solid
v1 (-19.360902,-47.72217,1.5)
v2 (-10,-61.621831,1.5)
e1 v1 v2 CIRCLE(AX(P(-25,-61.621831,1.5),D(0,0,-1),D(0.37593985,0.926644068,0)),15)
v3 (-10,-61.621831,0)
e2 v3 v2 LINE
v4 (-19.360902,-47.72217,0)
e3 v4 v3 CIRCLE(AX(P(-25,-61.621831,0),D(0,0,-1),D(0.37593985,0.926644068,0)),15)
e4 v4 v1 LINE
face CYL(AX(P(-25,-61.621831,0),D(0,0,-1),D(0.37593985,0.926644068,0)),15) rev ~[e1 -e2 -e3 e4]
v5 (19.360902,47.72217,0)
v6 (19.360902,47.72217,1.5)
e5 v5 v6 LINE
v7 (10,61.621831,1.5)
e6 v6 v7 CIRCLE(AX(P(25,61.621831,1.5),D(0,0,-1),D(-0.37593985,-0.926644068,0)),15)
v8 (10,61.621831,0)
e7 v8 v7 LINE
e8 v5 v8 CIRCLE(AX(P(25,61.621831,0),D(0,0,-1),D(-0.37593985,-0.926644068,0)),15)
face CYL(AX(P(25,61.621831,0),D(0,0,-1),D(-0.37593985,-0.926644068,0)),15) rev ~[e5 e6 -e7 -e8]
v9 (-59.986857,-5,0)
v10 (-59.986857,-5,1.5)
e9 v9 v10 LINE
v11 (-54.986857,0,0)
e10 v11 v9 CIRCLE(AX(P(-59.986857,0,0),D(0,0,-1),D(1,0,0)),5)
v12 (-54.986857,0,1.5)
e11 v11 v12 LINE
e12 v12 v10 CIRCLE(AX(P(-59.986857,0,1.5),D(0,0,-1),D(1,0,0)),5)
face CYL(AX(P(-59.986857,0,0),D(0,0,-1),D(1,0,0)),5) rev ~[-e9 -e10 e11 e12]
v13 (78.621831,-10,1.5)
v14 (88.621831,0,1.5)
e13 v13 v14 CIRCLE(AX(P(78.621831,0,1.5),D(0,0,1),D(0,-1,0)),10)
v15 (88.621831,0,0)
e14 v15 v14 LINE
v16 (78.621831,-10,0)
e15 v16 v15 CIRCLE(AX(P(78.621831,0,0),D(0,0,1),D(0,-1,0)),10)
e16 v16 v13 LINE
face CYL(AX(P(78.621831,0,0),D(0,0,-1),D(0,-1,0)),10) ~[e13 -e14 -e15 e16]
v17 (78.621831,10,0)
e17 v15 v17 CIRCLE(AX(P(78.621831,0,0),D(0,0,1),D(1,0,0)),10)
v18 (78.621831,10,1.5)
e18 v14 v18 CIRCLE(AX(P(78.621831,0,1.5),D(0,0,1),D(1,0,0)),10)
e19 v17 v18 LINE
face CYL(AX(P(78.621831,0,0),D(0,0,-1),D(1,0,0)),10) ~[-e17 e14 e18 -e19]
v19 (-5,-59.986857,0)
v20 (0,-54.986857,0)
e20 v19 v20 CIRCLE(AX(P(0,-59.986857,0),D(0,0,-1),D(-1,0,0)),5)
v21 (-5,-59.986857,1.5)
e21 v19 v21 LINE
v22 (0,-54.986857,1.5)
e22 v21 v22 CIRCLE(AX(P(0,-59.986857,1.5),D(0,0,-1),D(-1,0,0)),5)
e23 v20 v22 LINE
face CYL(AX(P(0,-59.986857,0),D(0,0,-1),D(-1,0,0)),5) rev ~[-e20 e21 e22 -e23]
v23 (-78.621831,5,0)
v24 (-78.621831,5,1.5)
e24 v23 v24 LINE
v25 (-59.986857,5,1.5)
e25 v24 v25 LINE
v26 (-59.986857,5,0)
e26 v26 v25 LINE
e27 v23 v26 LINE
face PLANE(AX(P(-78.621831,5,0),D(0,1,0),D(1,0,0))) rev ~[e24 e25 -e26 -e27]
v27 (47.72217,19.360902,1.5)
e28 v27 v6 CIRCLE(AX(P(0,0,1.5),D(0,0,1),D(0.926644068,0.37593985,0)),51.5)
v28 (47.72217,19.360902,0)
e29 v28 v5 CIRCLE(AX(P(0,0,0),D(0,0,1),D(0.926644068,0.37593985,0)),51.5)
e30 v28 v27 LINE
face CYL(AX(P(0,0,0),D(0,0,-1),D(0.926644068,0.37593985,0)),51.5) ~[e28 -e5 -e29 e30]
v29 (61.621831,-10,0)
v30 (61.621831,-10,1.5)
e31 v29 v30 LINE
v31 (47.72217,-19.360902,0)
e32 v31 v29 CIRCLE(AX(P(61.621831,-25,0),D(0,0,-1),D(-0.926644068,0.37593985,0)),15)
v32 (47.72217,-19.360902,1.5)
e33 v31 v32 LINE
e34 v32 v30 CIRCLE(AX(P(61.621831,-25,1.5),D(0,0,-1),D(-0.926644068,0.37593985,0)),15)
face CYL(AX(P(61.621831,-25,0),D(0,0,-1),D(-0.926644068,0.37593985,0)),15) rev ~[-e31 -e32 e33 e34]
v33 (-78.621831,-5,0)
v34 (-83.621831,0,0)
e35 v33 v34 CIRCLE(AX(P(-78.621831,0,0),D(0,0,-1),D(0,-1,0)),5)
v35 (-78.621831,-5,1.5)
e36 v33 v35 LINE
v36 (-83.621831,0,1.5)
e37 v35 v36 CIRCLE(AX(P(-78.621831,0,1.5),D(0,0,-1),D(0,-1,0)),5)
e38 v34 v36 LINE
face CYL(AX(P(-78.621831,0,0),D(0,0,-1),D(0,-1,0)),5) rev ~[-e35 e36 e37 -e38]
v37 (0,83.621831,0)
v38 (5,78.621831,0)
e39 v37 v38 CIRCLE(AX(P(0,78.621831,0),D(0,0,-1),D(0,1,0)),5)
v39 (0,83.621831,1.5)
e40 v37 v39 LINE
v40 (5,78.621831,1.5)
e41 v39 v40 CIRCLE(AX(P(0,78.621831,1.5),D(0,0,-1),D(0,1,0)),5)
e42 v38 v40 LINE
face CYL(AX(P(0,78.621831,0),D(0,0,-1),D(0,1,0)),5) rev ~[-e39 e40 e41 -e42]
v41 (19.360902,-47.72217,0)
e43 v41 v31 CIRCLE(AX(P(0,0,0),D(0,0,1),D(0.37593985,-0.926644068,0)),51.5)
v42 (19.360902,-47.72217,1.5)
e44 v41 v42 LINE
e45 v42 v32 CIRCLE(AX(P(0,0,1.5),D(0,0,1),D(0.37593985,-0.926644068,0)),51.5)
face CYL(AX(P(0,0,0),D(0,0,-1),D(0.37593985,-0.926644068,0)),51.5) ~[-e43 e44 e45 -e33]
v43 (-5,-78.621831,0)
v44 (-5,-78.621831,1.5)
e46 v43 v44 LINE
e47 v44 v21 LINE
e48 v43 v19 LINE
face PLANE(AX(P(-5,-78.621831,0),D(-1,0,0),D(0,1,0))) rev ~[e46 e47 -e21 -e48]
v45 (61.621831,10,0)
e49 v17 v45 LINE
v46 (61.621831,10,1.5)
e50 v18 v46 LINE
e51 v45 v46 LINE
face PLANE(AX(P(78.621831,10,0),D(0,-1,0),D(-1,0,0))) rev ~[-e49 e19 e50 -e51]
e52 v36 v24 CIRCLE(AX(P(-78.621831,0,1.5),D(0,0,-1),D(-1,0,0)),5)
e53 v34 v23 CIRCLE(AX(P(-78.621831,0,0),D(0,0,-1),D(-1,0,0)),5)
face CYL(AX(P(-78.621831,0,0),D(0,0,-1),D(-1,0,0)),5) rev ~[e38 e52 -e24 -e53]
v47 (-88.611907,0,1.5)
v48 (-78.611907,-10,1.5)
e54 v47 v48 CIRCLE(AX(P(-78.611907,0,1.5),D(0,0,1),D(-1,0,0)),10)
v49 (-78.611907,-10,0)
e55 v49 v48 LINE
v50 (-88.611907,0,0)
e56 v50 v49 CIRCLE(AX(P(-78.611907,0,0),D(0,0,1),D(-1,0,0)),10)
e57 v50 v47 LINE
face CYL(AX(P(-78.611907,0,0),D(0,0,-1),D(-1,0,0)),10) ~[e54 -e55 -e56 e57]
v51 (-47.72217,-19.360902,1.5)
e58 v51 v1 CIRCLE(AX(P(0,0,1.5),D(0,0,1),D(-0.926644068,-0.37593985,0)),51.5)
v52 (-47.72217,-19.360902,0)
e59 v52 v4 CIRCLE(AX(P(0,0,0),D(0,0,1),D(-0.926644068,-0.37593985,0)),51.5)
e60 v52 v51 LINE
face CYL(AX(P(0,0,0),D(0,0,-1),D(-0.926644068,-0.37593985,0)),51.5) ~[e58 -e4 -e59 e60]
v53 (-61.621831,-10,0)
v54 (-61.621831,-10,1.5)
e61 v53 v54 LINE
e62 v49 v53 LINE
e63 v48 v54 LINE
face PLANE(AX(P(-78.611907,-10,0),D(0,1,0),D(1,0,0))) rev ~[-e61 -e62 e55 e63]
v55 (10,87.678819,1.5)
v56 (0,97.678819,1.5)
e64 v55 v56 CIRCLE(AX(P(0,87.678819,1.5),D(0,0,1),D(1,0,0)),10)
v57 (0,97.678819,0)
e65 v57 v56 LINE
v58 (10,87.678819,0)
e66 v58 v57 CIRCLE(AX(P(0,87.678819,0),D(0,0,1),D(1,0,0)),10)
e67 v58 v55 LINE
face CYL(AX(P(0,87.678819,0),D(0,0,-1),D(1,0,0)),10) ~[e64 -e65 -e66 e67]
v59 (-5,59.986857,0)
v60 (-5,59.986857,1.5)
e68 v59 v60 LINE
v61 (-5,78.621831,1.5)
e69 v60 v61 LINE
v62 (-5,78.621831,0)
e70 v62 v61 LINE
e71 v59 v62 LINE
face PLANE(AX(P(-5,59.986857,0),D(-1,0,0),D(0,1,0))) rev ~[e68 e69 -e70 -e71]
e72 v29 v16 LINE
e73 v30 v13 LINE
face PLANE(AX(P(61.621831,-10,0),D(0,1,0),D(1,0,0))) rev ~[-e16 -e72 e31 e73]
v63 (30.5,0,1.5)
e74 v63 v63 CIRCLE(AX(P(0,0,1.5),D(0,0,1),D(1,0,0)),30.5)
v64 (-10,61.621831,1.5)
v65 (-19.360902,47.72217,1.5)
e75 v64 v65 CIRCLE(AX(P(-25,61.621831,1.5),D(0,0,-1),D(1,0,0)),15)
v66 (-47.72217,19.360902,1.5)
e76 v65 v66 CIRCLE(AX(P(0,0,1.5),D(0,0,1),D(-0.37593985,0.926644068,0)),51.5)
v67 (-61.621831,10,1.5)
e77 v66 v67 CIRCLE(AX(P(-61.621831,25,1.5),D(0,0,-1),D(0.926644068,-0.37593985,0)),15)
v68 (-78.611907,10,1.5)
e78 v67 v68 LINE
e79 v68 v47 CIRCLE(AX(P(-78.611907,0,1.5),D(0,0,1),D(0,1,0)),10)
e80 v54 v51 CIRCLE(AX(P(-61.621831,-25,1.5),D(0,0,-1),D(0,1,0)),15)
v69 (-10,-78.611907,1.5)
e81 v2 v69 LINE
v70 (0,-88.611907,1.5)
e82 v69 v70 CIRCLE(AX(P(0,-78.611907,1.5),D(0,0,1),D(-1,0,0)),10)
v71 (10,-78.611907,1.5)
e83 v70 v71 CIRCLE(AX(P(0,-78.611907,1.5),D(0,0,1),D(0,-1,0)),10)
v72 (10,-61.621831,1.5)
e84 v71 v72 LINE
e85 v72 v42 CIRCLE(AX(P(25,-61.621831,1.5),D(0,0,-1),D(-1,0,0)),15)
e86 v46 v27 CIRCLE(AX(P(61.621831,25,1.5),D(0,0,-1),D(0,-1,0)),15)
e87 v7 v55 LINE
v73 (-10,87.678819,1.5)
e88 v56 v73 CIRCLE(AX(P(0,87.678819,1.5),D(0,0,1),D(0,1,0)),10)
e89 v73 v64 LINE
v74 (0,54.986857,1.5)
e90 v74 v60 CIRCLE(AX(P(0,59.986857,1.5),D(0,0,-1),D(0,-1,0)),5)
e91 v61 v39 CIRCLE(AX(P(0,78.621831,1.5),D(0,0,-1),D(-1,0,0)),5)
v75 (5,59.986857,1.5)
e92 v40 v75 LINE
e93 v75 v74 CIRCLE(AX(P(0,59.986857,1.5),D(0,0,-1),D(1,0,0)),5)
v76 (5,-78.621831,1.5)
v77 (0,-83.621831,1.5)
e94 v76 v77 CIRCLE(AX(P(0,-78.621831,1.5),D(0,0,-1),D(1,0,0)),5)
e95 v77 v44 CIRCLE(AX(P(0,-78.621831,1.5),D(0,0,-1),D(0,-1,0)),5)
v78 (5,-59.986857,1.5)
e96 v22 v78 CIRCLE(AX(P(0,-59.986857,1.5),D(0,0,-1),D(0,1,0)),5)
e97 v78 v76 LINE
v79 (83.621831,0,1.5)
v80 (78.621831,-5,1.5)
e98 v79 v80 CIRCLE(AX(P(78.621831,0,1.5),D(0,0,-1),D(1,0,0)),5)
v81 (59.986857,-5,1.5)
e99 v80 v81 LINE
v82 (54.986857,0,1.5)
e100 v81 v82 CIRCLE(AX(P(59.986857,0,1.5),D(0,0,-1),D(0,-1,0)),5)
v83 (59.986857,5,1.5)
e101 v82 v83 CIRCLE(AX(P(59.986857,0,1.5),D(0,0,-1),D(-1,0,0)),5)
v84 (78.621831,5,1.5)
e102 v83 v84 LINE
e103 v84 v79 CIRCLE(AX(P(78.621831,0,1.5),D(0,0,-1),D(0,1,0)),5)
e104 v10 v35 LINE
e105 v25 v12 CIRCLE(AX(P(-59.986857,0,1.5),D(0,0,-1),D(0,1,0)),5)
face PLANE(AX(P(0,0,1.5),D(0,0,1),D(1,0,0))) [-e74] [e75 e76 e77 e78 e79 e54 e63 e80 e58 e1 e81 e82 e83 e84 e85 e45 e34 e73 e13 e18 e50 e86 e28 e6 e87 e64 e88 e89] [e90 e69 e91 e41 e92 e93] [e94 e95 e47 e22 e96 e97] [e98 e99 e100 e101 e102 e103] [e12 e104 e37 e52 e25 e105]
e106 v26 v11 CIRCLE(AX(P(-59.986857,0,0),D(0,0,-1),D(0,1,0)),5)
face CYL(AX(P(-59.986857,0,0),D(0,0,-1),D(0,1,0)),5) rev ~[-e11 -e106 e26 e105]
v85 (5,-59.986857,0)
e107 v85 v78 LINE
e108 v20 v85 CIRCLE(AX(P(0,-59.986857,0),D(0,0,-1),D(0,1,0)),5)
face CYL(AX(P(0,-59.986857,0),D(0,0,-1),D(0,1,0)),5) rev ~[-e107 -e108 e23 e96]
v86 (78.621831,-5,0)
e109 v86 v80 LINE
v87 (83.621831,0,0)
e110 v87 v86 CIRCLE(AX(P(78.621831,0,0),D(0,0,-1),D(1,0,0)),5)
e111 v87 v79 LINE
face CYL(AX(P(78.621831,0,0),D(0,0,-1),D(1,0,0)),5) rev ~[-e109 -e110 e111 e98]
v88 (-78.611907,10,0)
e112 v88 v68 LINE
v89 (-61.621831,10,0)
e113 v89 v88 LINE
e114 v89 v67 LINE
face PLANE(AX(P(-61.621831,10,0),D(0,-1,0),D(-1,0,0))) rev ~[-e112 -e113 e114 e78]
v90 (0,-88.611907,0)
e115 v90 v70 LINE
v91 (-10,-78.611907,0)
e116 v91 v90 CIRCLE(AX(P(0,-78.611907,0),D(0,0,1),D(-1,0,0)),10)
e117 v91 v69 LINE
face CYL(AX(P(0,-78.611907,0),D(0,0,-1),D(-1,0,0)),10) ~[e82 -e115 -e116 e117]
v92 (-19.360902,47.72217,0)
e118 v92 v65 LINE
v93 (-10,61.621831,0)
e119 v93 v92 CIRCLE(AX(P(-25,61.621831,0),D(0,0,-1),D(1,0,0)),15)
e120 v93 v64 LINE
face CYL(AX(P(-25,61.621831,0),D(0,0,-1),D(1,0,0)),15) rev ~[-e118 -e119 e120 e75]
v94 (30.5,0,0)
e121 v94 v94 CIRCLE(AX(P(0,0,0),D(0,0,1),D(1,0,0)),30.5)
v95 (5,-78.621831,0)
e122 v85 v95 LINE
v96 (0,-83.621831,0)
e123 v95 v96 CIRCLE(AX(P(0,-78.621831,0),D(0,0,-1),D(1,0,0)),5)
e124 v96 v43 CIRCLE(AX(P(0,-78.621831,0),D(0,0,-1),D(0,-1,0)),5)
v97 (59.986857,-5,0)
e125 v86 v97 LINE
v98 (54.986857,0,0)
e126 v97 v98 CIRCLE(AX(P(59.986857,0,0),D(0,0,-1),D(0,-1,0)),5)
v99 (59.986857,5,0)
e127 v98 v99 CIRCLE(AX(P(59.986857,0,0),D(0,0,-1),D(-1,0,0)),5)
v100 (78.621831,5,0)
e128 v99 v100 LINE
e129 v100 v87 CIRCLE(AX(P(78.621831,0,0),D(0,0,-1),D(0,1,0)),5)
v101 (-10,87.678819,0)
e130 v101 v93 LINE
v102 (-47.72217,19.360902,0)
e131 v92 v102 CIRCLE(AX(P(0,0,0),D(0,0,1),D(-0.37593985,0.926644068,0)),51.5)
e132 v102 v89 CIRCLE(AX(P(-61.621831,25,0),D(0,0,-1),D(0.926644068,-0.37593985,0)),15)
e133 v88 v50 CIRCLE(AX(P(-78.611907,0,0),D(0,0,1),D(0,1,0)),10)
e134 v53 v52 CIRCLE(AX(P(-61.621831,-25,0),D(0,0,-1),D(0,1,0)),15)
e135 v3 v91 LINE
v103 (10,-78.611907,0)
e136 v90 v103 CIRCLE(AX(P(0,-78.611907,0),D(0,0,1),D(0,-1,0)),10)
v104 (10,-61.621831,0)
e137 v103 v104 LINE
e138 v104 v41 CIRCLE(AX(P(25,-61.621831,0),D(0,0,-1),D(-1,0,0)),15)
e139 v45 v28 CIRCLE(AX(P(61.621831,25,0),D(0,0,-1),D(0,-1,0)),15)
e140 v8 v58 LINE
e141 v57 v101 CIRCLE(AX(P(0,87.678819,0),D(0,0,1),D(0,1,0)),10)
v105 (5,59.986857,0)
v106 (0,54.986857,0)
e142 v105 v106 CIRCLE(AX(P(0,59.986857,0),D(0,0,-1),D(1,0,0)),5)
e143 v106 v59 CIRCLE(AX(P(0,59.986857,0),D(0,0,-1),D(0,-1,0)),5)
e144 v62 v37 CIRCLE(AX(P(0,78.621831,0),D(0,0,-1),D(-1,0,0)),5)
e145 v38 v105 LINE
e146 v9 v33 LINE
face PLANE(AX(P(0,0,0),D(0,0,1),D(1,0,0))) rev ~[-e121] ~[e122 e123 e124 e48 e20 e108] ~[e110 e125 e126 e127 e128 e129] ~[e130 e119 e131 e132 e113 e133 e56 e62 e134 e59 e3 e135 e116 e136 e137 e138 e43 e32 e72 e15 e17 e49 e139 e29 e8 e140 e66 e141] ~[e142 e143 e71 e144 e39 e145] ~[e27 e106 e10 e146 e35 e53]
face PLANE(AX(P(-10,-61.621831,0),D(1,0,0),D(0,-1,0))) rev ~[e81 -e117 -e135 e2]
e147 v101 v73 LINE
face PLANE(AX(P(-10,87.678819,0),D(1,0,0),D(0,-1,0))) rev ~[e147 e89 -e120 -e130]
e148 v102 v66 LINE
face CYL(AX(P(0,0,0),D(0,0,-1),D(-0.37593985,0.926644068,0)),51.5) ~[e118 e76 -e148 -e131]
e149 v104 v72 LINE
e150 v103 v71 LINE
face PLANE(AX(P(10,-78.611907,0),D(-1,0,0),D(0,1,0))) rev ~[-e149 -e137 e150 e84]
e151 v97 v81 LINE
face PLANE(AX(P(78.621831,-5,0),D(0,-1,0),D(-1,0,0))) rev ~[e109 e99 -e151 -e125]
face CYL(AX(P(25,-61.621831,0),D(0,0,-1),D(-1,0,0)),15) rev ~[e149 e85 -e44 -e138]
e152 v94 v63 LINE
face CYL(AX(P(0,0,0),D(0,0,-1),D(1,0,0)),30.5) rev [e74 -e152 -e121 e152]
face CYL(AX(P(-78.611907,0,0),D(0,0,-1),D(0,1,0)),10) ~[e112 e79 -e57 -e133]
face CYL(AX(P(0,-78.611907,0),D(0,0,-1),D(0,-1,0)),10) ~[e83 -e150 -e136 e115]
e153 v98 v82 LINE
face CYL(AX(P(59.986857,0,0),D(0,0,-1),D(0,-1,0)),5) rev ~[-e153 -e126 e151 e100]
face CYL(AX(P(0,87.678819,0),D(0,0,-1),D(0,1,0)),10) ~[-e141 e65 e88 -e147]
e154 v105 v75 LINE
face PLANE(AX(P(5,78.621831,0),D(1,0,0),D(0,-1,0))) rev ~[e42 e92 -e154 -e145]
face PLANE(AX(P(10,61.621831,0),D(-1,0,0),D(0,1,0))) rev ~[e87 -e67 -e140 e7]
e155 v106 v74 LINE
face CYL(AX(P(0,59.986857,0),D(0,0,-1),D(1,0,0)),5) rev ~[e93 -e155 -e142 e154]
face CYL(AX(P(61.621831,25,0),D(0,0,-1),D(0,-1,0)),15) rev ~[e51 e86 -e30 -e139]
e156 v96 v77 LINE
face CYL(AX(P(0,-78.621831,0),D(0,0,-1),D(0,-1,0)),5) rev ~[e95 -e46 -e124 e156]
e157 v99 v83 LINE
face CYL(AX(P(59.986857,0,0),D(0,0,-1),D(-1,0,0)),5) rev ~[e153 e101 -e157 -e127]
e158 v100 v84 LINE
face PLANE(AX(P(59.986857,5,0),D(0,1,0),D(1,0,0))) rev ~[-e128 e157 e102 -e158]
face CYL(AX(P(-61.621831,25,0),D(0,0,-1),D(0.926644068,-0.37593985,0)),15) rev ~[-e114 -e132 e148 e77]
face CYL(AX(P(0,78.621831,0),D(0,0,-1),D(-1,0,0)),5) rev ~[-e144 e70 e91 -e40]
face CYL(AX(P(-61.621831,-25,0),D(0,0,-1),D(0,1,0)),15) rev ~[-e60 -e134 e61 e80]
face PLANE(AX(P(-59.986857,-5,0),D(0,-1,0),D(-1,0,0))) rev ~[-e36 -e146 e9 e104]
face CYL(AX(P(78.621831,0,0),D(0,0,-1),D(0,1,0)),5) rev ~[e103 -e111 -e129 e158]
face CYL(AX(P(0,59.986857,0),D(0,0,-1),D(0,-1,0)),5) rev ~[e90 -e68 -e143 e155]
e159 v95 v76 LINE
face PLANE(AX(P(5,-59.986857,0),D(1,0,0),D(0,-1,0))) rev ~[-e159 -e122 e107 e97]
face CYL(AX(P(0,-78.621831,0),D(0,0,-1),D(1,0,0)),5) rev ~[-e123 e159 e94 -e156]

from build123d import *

# Parameters (mm, degrees)
F0_R     = 30.5
F0_W     = 5
F0_H     = 10.5
F0_W_2   = 10.5
F0_H_2   = 5
F1_DEPTH = 1.5


# Not quite as in the source:
# - a feature names something its author has since deleted; it is built from what else it names


with BuildPart() as f1:
    # F0 (on Top) → F1 (new body)
    with BuildSketch(Plane.XY):
        with BuildLine():
            ThreePointArc((-10, 61.6218305473), (-12.5584071324, 53.2428827066), (-19.3609022556, 47.7221695216))
            ThreePointArc((-19.3609022556, 47.7221695216), (-36.4159992311, 36.4159992311), (-47.7221695216, 19.3609022556))
            ThreePointArc((-47.7221695216, 19.3609022556), (-53.2428827066, 12.5584071324), (-61.6218305473, 10))
            Line((-61.6218305473, 10), (-65.6218305473, 10))
            Line((-65.6218305473, 10), (-65.6218305473, 5))
            Line((-65.6218305473, 5), (-59.986856736, 5))
            ThreePointArc((-59.986856736, 5), (-56.45132283, 3.5355339059), (-54.986856736, 0))
            ThreePointArc((-54.986856736, 0), (-56.45132283, -3.5355339059), (-59.986856736, -5))
            Line((-59.986856736, -5), (-65.6218305473, -5))
            Line((-65.6218305473, -5), (-65.6218305473, -10))
            Line((-65.6218305473, -10), (-61.6218305473, -10))
            ThreePointArc((-61.6218305473, -10), (-53.2428827066, -12.5584071324), (-47.7221695216, -19.3609022556))
            ThreePointArc((-47.7221695216, -19.3609022556), (-36.4159992311, -36.4159992311), (-19.3609022556, -47.7221695216))
            ThreePointArc((-19.3609022556, -47.7221695216), (-12.5584071324, -53.2428827066), (-10, -61.6218305473))
            Line((-10, -61.6218305473), (-10, -65.6218305473))
            Line((-10, -65.6218305473), (-5, -65.6218305473))
            Line((-5, -65.6218305473), (-5, -59.986856736))
            ThreePointArc((-5, -59.986856736), (-3.5355339059, -56.45132283), (0, -54.986856736))
            ThreePointArc((0, -54.986856736), (3.5355339059, -56.45132283), (5, -59.986856736))
            Line((5, -59.986856736), (5, -65.6218305473))
            Line((5, -65.6218305473), (10, -65.6218305473))
            Line((10, -65.6218305473), (10, -61.6218305473))
            ThreePointArc((10, -61.6218305473), (12.5584071324, -53.2428827066), (19.3609022556, -47.7221695216))
            ThreePointArc((19.3609022556, -47.7221695216), (36.4159992311, -36.4159992311), (47.7221695216, -19.3609022556))
            ThreePointArc((47.7221695216, -19.3609022556), (53.2428827066, -12.5584071324), (61.6218305473, -10))
            Line((61.6218305473, -10), (65.6218305473, -10))
            Line((65.6218305473, -10), (65.6218305473, -5))
            Line((65.6218305473, -5), (59.986856736, -5))
            ThreePointArc((59.986856736, -5), (56.45132283, -3.5355339059), (54.986856736, 0))
            ThreePointArc((54.986856736, 0), (56.45132283, 3.5355339059), (59.986856736, 5))
            Line((59.986856736, 5), (65.6218305473, 5))
            Line((65.6218305473, 5), (65.6218305473, 10))
            Line((65.6218305473, 10), (61.6218305473, 10))
            ThreePointArc((61.6218305473, 10), (53.2428827066, 12.5584071324), (47.7221695216, 19.3609022556))
            ThreePointArc((47.7221695216, 19.3609022556), (36.4159992311, 36.4159992311), (19.3609022556, 47.7221695216))
            ThreePointArc((19.3609022556, 47.7221695216), (12.5584071324, 53.2428827066), (10, 61.6218305473))
            Line((10, 61.6218305473), (10, 65.6218305473))
            Line((10, 65.6218305473), (5, 65.6218305473))
            Line((5, 65.6218305473), (5, 59.986856736))
            ThreePointArc((5, 59.986856736), (3.5355339059, 56.45132283), (0, 54.986856736))
            ThreePointArc((0, 54.986856736), (-3.5355339059, 56.45132283), (-5, 59.986856736))
            Line((-5, 59.986856736), (-5, 65.6218305473))
            Line((-5, 65.6218305473), (-10, 65.6218305473))
            Line((-10, 65.6218305473), (-10, 61.6218305473))
        make_face()
        Circle(F0_R, mode=Mode.SUBTRACT)
        with Locations((7.5, 70.8718305473)):
            Rectangle(F0_W, F0_H)
        with Locations((-7.5, 70.8718305473)):
            Rectangle(F0_W, F0_H)
        with Locations((70.8718305473, 7.5)):
            Rectangle(F0_W_2, F0_H_2)
        with Locations((70.8718305473, -7.5)):
            Rectangle(F0_W_2, F0_H_2)
        with BuildLine():
            Line((78.6218305473, 10), (76.1218305473, 10))
            Line((76.1218305473, 10), (76.1218305473, 5))
            Line((76.1218305473, 5), (78.6218305473, 5))
            ThreePointArc((78.6218305473, 5), (82.1573644532, 3.5355339059), (83.6218305473, 0))
            ThreePointArc((83.6218305473, 0), (82.1573644532, -3.5355339059), (78.6218305473, -5))
            Line((78.6218305473, -5), (76.1218305473, -5))
            Line((76.1218305473, -5), (76.1218305473, -10))
            Line((76.1218305473, -10), (78.6218305473, -10))
            ThreePointArc((78.6218305473, -10), (85.6928983592, -7.0710678119), (88.6218305473, 0))
            ThreePointArc((88.6218305473, 0), (85.6928983592, 7.0710678119), (78.6218305473, 10))
        make_face()
        with Locations((-70.8718305473, -7.5)):
            Rectangle(F0_W_2, F0_H_2)
        with Locations((-70.8718305473, 7.5)):
            Rectangle(F0_W_2, F0_H_2)
        with BuildLine():
            Line((-76.1218305473, 5), (-76.1218305473, 10))
            Line((-76.1218305473, 10), (-78.611907205, 10))
            ThreePointArc((-78.611907205, 10), (-85.6829750169, 7.0710678119), (-88.611907205, 0))
            ThreePointArc((-88.611907205, 0), (-85.6829750169, -7.0710678119), (-78.611907205, -10))
            Line((-78.611907205, -10), (-76.1218305473, -10))
            Line((-76.1218305473, -10), (-76.1218305473, -5))
            Line((-76.1218305473, -5), (-78.6218305473, -5))
            ThreePointArc((-78.6218305473, -5), (-82.1573644532, -3.5355339059), (-83.6218305473, 0))
            ThreePointArc((-83.6218305473, 0), (-82.1573644532, 3.5355339059), (-78.6218305473, 5))
            Line((-78.6218305473, 5), (-76.1218305473, 5))
        make_face()
        with Locations((-7.5, -70.8718305473)):
            Rectangle(F0_W, F0_H)
        with Locations((7.5, -70.8718305473)):
            Rectangle(F0_W, F0_H)
        with BuildLine():
            Line((-5, -76.1218305473), (-10, -76.1218305473))
            Line((-10, -76.1218305473), (-10, -78.611907205))
            ThreePointArc((-10, -78.611907205), (-7.0710678119, -85.6829750169), (0, -88.611907205))
            ThreePointArc((0, -88.611907205), (7.0710678119, -85.6829750169), (10, -78.611907205))
            Line((10, -78.611907205), (10, -76.1218305473))
            Line((10, -76.1218305473), (5, -76.1218305473))
            Line((5, -76.1218305473), (5, -78.6218305473))
            ThreePointArc((5, -78.6218305473), (3.5355339059, -82.1573644532), (0, -83.6218305473))
            ThreePointArc((0, -83.6218305473), (-3.5355339059, -82.1573644532), (-5, -78.6218305473))
            Line((-5, -78.6218305473), (-5, -76.1218305473))
        make_face()
        with BuildLine():
            Line((-10, 87.6788190633), (-10, 76.1218305473))
            Line((-10, 76.1218305473), (-5, 76.1218305473))
            Line((-5, 76.1218305473), (-5, 78.6218305473))
            ThreePointArc((-5, 78.6218305473), (-3.5355339059, 82.1573644532), (0, 83.6218305473))
            ThreePointArc((0, 83.6218305473), (3.5355339059, 82.1573644532), (5, 78.6218305473))
            Line((5, 78.6218305473), (5, 76.1218305473))
            Line((5, 76.1218305473), (10, 76.1218305473))
            Line((10, 76.1218305473), (10, 87.6788190633))
            ThreePointArc((10, 87.6788190633), (7.0710678119, 94.7498868751), (0, 97.6788190633))
            ThreePointArc((0, 97.6788190633), (-7.0710678119, 94.7498868751), (-10, 87.6788190633))
        make_face()
    extrude(amount=F1_DEPTH)


solid = f1.part
